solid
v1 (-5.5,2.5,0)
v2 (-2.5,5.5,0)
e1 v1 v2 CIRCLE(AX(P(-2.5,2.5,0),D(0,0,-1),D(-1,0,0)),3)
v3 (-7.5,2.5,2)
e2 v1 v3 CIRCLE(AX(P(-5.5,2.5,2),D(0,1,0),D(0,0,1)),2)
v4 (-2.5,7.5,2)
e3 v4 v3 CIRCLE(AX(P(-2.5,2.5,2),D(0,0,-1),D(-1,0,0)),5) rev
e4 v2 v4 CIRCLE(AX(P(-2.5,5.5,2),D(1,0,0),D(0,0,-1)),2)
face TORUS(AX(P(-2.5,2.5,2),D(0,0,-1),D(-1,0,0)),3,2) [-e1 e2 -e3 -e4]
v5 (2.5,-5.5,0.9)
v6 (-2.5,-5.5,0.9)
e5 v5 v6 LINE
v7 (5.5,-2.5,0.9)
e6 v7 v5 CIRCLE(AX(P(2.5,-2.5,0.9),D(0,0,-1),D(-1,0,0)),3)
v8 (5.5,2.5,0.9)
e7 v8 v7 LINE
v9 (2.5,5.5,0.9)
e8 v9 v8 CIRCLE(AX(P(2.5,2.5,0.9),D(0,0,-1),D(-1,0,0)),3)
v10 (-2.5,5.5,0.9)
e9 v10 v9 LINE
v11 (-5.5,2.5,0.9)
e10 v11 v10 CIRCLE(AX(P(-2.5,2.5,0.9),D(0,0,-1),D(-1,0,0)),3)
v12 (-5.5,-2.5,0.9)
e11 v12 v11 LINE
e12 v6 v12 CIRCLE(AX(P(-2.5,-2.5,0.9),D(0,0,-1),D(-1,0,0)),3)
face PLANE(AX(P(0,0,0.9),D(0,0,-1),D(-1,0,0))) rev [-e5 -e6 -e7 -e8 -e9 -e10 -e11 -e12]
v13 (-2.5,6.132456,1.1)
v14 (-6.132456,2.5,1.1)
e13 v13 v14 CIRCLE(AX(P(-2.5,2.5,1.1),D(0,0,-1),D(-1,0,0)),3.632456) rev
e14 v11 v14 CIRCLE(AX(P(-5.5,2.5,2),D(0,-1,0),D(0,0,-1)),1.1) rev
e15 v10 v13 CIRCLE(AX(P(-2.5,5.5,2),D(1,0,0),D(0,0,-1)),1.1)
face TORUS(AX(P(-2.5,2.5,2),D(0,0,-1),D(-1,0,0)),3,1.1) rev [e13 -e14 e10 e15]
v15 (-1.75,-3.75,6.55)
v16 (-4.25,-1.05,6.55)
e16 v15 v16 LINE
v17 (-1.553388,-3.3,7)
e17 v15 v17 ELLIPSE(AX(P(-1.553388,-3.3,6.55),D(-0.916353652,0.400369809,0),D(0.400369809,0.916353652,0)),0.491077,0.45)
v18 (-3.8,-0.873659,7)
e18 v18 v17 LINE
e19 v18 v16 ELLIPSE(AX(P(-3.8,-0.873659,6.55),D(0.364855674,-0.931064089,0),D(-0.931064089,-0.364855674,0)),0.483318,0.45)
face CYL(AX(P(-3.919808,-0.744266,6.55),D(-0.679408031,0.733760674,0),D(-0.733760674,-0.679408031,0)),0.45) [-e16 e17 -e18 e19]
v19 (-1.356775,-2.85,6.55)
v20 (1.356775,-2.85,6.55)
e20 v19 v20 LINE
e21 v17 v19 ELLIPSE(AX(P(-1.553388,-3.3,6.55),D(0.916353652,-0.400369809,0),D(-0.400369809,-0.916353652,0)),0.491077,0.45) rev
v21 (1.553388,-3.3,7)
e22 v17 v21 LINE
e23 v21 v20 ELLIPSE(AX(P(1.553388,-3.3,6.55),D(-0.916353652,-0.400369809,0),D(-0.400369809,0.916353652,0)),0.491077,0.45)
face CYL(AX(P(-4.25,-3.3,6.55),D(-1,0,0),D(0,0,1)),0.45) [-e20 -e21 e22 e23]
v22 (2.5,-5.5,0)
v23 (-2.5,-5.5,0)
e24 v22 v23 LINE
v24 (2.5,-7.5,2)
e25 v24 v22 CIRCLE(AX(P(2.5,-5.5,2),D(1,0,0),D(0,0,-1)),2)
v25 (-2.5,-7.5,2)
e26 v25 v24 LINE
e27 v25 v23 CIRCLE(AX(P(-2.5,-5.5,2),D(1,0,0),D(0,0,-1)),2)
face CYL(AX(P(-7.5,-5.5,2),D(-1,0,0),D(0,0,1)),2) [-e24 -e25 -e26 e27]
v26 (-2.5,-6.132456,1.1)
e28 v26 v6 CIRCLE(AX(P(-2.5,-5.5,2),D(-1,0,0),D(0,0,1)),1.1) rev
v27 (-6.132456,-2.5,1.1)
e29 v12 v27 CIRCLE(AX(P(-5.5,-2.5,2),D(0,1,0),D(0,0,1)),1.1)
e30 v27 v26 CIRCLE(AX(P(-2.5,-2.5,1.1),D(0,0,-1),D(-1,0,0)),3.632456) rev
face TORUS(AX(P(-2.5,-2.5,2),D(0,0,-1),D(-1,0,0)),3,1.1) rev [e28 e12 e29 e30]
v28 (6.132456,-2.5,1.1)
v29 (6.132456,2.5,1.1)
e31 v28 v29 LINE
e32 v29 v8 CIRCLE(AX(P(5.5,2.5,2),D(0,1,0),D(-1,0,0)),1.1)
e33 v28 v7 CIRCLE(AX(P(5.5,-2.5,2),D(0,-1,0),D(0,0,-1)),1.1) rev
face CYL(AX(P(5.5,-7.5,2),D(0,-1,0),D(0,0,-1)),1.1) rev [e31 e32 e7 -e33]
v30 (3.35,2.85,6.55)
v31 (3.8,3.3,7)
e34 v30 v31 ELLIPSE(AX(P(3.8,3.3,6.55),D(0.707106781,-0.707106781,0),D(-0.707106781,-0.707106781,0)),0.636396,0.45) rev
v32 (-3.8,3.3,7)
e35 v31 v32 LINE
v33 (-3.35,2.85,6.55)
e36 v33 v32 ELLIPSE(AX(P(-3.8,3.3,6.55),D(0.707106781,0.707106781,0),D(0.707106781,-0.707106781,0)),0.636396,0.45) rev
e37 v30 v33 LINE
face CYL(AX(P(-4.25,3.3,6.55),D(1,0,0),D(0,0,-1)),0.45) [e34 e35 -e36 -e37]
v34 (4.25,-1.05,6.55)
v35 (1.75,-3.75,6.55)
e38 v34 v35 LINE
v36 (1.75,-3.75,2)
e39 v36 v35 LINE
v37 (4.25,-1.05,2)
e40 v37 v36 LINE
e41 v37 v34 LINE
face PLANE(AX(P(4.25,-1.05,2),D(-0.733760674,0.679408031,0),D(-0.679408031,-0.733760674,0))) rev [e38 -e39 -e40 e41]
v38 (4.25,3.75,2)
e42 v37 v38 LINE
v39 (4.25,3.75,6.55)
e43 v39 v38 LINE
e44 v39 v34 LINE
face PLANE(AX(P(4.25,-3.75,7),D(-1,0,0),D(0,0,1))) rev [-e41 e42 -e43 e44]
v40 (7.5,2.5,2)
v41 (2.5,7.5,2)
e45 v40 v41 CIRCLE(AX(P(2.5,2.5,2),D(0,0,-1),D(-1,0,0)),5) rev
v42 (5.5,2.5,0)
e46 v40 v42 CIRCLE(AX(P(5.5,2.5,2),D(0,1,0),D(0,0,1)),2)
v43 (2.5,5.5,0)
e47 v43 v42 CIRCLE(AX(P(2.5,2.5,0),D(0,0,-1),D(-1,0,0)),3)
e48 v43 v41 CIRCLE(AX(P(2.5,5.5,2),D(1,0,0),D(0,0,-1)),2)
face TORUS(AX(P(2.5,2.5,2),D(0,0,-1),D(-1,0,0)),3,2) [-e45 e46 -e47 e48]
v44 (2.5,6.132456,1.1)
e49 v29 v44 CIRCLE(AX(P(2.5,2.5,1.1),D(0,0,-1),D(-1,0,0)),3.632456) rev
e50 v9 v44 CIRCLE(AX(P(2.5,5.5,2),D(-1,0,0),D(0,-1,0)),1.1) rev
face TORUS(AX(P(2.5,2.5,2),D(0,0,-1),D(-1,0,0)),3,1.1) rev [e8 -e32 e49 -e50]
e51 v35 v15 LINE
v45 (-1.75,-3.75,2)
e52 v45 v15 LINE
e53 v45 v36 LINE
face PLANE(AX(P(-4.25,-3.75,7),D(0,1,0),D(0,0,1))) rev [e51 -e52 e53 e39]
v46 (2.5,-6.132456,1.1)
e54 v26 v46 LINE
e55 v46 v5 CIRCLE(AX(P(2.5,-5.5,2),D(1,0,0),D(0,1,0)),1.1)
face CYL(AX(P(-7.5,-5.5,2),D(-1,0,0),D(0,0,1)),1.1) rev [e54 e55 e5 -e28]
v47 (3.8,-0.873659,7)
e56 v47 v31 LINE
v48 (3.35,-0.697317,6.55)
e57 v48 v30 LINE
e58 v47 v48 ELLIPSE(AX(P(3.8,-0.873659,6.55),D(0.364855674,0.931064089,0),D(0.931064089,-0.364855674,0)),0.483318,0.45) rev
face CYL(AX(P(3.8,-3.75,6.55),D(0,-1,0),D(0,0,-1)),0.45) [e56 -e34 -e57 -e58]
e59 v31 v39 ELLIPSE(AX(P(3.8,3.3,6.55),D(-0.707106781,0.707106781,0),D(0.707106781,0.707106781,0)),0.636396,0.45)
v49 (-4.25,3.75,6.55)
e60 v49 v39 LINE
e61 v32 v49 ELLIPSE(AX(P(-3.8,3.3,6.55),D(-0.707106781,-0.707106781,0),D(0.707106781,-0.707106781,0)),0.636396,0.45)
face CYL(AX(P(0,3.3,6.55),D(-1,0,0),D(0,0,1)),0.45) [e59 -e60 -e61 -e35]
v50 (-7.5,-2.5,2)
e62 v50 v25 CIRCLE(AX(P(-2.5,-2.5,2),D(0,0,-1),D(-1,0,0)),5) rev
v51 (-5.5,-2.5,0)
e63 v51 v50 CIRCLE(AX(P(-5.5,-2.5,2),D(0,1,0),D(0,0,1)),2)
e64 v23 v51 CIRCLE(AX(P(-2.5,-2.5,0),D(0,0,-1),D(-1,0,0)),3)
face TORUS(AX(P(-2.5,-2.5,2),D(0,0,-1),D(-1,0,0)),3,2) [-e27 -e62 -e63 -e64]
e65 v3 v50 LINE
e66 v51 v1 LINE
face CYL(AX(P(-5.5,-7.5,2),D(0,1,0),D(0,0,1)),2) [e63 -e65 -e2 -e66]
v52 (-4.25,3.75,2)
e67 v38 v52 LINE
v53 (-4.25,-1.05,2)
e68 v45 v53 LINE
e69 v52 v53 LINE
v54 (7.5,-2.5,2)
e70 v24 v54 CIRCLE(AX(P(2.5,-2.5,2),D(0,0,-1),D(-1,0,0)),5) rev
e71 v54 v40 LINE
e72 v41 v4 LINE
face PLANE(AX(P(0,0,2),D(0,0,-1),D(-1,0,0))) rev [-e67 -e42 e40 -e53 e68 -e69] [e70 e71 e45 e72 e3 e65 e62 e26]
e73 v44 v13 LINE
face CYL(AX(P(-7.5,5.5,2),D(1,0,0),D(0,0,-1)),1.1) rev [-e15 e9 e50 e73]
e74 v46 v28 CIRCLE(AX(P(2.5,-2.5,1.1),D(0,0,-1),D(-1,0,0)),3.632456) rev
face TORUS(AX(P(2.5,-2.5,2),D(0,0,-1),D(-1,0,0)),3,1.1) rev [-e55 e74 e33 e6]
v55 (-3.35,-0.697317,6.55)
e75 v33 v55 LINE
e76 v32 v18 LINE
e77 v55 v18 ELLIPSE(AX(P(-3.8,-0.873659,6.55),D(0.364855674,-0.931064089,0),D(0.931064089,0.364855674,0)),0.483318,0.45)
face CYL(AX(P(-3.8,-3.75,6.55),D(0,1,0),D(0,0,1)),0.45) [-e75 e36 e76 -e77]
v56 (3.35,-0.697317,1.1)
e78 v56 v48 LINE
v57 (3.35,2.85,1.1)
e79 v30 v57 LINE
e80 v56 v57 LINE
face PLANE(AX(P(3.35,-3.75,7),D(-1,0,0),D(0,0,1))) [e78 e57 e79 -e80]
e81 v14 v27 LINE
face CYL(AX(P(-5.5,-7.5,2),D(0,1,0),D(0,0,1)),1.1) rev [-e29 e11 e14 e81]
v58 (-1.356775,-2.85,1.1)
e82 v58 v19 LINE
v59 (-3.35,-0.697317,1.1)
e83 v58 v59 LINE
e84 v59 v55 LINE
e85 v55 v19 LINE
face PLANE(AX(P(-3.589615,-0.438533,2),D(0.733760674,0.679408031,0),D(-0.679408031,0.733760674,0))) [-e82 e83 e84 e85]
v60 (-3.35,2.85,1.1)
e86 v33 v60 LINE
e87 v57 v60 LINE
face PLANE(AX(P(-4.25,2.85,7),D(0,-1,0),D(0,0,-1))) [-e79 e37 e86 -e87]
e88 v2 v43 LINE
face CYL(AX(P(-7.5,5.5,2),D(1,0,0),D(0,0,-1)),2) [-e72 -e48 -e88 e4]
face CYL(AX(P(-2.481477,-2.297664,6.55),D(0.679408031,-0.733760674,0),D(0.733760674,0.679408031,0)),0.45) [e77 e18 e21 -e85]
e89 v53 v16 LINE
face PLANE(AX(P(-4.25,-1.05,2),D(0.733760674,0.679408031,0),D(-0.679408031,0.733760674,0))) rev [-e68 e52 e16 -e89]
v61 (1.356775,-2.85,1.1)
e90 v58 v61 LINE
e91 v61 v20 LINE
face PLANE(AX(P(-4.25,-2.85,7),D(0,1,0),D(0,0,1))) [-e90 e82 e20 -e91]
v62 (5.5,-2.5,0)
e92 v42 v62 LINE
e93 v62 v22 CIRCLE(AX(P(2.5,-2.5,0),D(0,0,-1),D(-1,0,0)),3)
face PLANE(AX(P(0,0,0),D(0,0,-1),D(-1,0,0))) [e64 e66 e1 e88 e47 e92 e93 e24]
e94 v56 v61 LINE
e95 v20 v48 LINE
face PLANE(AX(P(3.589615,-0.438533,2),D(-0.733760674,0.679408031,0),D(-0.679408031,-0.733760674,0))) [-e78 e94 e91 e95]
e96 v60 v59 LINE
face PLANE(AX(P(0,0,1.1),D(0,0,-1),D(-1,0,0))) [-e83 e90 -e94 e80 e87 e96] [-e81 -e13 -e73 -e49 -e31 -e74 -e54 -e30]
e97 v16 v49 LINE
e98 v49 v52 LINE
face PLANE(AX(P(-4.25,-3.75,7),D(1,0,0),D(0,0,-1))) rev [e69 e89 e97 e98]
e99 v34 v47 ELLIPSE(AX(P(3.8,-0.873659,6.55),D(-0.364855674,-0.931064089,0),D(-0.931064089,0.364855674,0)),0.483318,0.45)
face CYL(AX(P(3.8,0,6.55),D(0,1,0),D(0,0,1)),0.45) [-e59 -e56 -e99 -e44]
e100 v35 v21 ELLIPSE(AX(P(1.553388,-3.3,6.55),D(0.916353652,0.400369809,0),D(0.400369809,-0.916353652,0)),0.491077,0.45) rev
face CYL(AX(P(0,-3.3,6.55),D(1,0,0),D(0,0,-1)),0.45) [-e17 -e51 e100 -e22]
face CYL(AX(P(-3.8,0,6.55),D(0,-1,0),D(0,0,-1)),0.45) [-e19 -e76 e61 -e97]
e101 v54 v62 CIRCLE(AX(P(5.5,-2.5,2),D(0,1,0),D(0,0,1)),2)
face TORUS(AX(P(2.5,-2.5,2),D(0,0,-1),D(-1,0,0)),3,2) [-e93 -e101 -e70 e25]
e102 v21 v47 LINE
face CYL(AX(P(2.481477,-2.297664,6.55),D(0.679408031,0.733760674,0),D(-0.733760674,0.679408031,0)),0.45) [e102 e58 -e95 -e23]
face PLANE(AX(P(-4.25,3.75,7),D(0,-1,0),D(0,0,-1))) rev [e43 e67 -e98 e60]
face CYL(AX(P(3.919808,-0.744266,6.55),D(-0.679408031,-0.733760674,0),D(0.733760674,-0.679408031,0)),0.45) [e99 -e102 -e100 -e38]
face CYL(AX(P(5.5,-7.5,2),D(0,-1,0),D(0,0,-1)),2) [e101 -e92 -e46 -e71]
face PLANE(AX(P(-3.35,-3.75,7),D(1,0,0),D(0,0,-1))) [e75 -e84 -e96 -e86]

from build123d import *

# Parameters (mm, degrees)
SKETCH1_W           = 15
SKETCH1_H           = 15
BOSS_EXTRUDE1_DEPTH = 2
FILLET11_R          = 5
FILLET13_R          = 2
SKETCH7_W           = 8.5
SKETCH7_H           = 7.5
BOSS_EXTRUDE5_DEPTH = 5
CUT_EXTRUDE3_DEPTH  = 5
SHELL8_T            = -0.9
FILLET15_R          = 0.45


with BuildPart() as part:
    # Sketch1 → Boss-Extrude1 (new body)
    with BuildSketch(Plane.XY):
        Rectangle(SKETCH1_W, SKETCH1_H)
    extrude(amount=BOSS_EXTRUDE1_DEPTH)

    # Fillet11
    fillet11_edges = [part.edges().sort_by_distance(p)[0] for p in [
        (7.5, -7.5, 1),
        (-7.5, -7.5, 1),
        (-7.5, 7.5, 1),
        (7.5, 7.5, 1),
    ]]
    fillet(fillet11_edges, radius=FILLET11_R)

    # Fillet13
    fillet13_edges = [part.edges().sort_by_distance(p)[0] for p in [
        (6.035533906, 6.035533906, 0),
        (0, 7.5, 0),
        (-6.035533906, 6.035533906, 0),
        (-7.5, 0, 0),
        (-6.035533906, -6.035533906, 0),
        (0, -7.5, 0),
        (6.035533906, -6.035533906, 0),
        (7.5, 0, 0),
    ]]
    fillet(fillet13_edges, radius=FILLET13_R - 0.0001)  # a hair under: the kernel refuses the full size

    # Sketch7 → Boss-Extrude5 (add)
    with BuildSketch(Plane.XY.offset(2)):
        Rectangle(SKETCH7_W, SKETCH7_H)
    extrude(amount=BOSS_EXTRUDE5_DEPTH)

    # Sketch8 → Cut-Extrude3 (cut)
    with BuildSketch(Plane.XY.offset(7)):
        Polygon((-4.25, -1.05), (-1.75, -3.75), (-4.25, -3.75), align=None)
        Polygon((4.25, -1.05), (1.75, -3.75), (4.25, -3.75), align=None)
    extrude(amount=-CUT_EXTRUDE3_DEPTH, mode=Mode.SUBTRACT)

    # Shell8
    shell8_openings = [part.faces().sort_by_distance(p)[0] for p in [
        (0, 0.3375, 7),
    ]]
    offset(amount=SHELL8_T, openings=shell8_openings, kind=Kind.INTERSECTION)

    # Fillet15
    fillet15_edges = [part.edges().sort_by_distance(p)[0] for p in [
        (0, 2.85, 7),
        (2.353387684, -1.773658698, 7),
        (-2.353387684, -1.773658698, 7),
        (0, 3.75, 7),
        (-4.25, 1.35, 7),
        (4.25, 1.35, 7),
        (0, -3.75, 7),
        (-3, -2.4, 7),
        (3, -2.4, 7),
        (-3.35, 1.076341302, 7),
        (0, -2.85, 7),
        (3.35, 1.076341302, 7),
    ]]
    fillet(fillet15_edges, radius=FILLET15_R - 0.0001)  # a hair under: the kernel refuses the full size


solid = part.part
